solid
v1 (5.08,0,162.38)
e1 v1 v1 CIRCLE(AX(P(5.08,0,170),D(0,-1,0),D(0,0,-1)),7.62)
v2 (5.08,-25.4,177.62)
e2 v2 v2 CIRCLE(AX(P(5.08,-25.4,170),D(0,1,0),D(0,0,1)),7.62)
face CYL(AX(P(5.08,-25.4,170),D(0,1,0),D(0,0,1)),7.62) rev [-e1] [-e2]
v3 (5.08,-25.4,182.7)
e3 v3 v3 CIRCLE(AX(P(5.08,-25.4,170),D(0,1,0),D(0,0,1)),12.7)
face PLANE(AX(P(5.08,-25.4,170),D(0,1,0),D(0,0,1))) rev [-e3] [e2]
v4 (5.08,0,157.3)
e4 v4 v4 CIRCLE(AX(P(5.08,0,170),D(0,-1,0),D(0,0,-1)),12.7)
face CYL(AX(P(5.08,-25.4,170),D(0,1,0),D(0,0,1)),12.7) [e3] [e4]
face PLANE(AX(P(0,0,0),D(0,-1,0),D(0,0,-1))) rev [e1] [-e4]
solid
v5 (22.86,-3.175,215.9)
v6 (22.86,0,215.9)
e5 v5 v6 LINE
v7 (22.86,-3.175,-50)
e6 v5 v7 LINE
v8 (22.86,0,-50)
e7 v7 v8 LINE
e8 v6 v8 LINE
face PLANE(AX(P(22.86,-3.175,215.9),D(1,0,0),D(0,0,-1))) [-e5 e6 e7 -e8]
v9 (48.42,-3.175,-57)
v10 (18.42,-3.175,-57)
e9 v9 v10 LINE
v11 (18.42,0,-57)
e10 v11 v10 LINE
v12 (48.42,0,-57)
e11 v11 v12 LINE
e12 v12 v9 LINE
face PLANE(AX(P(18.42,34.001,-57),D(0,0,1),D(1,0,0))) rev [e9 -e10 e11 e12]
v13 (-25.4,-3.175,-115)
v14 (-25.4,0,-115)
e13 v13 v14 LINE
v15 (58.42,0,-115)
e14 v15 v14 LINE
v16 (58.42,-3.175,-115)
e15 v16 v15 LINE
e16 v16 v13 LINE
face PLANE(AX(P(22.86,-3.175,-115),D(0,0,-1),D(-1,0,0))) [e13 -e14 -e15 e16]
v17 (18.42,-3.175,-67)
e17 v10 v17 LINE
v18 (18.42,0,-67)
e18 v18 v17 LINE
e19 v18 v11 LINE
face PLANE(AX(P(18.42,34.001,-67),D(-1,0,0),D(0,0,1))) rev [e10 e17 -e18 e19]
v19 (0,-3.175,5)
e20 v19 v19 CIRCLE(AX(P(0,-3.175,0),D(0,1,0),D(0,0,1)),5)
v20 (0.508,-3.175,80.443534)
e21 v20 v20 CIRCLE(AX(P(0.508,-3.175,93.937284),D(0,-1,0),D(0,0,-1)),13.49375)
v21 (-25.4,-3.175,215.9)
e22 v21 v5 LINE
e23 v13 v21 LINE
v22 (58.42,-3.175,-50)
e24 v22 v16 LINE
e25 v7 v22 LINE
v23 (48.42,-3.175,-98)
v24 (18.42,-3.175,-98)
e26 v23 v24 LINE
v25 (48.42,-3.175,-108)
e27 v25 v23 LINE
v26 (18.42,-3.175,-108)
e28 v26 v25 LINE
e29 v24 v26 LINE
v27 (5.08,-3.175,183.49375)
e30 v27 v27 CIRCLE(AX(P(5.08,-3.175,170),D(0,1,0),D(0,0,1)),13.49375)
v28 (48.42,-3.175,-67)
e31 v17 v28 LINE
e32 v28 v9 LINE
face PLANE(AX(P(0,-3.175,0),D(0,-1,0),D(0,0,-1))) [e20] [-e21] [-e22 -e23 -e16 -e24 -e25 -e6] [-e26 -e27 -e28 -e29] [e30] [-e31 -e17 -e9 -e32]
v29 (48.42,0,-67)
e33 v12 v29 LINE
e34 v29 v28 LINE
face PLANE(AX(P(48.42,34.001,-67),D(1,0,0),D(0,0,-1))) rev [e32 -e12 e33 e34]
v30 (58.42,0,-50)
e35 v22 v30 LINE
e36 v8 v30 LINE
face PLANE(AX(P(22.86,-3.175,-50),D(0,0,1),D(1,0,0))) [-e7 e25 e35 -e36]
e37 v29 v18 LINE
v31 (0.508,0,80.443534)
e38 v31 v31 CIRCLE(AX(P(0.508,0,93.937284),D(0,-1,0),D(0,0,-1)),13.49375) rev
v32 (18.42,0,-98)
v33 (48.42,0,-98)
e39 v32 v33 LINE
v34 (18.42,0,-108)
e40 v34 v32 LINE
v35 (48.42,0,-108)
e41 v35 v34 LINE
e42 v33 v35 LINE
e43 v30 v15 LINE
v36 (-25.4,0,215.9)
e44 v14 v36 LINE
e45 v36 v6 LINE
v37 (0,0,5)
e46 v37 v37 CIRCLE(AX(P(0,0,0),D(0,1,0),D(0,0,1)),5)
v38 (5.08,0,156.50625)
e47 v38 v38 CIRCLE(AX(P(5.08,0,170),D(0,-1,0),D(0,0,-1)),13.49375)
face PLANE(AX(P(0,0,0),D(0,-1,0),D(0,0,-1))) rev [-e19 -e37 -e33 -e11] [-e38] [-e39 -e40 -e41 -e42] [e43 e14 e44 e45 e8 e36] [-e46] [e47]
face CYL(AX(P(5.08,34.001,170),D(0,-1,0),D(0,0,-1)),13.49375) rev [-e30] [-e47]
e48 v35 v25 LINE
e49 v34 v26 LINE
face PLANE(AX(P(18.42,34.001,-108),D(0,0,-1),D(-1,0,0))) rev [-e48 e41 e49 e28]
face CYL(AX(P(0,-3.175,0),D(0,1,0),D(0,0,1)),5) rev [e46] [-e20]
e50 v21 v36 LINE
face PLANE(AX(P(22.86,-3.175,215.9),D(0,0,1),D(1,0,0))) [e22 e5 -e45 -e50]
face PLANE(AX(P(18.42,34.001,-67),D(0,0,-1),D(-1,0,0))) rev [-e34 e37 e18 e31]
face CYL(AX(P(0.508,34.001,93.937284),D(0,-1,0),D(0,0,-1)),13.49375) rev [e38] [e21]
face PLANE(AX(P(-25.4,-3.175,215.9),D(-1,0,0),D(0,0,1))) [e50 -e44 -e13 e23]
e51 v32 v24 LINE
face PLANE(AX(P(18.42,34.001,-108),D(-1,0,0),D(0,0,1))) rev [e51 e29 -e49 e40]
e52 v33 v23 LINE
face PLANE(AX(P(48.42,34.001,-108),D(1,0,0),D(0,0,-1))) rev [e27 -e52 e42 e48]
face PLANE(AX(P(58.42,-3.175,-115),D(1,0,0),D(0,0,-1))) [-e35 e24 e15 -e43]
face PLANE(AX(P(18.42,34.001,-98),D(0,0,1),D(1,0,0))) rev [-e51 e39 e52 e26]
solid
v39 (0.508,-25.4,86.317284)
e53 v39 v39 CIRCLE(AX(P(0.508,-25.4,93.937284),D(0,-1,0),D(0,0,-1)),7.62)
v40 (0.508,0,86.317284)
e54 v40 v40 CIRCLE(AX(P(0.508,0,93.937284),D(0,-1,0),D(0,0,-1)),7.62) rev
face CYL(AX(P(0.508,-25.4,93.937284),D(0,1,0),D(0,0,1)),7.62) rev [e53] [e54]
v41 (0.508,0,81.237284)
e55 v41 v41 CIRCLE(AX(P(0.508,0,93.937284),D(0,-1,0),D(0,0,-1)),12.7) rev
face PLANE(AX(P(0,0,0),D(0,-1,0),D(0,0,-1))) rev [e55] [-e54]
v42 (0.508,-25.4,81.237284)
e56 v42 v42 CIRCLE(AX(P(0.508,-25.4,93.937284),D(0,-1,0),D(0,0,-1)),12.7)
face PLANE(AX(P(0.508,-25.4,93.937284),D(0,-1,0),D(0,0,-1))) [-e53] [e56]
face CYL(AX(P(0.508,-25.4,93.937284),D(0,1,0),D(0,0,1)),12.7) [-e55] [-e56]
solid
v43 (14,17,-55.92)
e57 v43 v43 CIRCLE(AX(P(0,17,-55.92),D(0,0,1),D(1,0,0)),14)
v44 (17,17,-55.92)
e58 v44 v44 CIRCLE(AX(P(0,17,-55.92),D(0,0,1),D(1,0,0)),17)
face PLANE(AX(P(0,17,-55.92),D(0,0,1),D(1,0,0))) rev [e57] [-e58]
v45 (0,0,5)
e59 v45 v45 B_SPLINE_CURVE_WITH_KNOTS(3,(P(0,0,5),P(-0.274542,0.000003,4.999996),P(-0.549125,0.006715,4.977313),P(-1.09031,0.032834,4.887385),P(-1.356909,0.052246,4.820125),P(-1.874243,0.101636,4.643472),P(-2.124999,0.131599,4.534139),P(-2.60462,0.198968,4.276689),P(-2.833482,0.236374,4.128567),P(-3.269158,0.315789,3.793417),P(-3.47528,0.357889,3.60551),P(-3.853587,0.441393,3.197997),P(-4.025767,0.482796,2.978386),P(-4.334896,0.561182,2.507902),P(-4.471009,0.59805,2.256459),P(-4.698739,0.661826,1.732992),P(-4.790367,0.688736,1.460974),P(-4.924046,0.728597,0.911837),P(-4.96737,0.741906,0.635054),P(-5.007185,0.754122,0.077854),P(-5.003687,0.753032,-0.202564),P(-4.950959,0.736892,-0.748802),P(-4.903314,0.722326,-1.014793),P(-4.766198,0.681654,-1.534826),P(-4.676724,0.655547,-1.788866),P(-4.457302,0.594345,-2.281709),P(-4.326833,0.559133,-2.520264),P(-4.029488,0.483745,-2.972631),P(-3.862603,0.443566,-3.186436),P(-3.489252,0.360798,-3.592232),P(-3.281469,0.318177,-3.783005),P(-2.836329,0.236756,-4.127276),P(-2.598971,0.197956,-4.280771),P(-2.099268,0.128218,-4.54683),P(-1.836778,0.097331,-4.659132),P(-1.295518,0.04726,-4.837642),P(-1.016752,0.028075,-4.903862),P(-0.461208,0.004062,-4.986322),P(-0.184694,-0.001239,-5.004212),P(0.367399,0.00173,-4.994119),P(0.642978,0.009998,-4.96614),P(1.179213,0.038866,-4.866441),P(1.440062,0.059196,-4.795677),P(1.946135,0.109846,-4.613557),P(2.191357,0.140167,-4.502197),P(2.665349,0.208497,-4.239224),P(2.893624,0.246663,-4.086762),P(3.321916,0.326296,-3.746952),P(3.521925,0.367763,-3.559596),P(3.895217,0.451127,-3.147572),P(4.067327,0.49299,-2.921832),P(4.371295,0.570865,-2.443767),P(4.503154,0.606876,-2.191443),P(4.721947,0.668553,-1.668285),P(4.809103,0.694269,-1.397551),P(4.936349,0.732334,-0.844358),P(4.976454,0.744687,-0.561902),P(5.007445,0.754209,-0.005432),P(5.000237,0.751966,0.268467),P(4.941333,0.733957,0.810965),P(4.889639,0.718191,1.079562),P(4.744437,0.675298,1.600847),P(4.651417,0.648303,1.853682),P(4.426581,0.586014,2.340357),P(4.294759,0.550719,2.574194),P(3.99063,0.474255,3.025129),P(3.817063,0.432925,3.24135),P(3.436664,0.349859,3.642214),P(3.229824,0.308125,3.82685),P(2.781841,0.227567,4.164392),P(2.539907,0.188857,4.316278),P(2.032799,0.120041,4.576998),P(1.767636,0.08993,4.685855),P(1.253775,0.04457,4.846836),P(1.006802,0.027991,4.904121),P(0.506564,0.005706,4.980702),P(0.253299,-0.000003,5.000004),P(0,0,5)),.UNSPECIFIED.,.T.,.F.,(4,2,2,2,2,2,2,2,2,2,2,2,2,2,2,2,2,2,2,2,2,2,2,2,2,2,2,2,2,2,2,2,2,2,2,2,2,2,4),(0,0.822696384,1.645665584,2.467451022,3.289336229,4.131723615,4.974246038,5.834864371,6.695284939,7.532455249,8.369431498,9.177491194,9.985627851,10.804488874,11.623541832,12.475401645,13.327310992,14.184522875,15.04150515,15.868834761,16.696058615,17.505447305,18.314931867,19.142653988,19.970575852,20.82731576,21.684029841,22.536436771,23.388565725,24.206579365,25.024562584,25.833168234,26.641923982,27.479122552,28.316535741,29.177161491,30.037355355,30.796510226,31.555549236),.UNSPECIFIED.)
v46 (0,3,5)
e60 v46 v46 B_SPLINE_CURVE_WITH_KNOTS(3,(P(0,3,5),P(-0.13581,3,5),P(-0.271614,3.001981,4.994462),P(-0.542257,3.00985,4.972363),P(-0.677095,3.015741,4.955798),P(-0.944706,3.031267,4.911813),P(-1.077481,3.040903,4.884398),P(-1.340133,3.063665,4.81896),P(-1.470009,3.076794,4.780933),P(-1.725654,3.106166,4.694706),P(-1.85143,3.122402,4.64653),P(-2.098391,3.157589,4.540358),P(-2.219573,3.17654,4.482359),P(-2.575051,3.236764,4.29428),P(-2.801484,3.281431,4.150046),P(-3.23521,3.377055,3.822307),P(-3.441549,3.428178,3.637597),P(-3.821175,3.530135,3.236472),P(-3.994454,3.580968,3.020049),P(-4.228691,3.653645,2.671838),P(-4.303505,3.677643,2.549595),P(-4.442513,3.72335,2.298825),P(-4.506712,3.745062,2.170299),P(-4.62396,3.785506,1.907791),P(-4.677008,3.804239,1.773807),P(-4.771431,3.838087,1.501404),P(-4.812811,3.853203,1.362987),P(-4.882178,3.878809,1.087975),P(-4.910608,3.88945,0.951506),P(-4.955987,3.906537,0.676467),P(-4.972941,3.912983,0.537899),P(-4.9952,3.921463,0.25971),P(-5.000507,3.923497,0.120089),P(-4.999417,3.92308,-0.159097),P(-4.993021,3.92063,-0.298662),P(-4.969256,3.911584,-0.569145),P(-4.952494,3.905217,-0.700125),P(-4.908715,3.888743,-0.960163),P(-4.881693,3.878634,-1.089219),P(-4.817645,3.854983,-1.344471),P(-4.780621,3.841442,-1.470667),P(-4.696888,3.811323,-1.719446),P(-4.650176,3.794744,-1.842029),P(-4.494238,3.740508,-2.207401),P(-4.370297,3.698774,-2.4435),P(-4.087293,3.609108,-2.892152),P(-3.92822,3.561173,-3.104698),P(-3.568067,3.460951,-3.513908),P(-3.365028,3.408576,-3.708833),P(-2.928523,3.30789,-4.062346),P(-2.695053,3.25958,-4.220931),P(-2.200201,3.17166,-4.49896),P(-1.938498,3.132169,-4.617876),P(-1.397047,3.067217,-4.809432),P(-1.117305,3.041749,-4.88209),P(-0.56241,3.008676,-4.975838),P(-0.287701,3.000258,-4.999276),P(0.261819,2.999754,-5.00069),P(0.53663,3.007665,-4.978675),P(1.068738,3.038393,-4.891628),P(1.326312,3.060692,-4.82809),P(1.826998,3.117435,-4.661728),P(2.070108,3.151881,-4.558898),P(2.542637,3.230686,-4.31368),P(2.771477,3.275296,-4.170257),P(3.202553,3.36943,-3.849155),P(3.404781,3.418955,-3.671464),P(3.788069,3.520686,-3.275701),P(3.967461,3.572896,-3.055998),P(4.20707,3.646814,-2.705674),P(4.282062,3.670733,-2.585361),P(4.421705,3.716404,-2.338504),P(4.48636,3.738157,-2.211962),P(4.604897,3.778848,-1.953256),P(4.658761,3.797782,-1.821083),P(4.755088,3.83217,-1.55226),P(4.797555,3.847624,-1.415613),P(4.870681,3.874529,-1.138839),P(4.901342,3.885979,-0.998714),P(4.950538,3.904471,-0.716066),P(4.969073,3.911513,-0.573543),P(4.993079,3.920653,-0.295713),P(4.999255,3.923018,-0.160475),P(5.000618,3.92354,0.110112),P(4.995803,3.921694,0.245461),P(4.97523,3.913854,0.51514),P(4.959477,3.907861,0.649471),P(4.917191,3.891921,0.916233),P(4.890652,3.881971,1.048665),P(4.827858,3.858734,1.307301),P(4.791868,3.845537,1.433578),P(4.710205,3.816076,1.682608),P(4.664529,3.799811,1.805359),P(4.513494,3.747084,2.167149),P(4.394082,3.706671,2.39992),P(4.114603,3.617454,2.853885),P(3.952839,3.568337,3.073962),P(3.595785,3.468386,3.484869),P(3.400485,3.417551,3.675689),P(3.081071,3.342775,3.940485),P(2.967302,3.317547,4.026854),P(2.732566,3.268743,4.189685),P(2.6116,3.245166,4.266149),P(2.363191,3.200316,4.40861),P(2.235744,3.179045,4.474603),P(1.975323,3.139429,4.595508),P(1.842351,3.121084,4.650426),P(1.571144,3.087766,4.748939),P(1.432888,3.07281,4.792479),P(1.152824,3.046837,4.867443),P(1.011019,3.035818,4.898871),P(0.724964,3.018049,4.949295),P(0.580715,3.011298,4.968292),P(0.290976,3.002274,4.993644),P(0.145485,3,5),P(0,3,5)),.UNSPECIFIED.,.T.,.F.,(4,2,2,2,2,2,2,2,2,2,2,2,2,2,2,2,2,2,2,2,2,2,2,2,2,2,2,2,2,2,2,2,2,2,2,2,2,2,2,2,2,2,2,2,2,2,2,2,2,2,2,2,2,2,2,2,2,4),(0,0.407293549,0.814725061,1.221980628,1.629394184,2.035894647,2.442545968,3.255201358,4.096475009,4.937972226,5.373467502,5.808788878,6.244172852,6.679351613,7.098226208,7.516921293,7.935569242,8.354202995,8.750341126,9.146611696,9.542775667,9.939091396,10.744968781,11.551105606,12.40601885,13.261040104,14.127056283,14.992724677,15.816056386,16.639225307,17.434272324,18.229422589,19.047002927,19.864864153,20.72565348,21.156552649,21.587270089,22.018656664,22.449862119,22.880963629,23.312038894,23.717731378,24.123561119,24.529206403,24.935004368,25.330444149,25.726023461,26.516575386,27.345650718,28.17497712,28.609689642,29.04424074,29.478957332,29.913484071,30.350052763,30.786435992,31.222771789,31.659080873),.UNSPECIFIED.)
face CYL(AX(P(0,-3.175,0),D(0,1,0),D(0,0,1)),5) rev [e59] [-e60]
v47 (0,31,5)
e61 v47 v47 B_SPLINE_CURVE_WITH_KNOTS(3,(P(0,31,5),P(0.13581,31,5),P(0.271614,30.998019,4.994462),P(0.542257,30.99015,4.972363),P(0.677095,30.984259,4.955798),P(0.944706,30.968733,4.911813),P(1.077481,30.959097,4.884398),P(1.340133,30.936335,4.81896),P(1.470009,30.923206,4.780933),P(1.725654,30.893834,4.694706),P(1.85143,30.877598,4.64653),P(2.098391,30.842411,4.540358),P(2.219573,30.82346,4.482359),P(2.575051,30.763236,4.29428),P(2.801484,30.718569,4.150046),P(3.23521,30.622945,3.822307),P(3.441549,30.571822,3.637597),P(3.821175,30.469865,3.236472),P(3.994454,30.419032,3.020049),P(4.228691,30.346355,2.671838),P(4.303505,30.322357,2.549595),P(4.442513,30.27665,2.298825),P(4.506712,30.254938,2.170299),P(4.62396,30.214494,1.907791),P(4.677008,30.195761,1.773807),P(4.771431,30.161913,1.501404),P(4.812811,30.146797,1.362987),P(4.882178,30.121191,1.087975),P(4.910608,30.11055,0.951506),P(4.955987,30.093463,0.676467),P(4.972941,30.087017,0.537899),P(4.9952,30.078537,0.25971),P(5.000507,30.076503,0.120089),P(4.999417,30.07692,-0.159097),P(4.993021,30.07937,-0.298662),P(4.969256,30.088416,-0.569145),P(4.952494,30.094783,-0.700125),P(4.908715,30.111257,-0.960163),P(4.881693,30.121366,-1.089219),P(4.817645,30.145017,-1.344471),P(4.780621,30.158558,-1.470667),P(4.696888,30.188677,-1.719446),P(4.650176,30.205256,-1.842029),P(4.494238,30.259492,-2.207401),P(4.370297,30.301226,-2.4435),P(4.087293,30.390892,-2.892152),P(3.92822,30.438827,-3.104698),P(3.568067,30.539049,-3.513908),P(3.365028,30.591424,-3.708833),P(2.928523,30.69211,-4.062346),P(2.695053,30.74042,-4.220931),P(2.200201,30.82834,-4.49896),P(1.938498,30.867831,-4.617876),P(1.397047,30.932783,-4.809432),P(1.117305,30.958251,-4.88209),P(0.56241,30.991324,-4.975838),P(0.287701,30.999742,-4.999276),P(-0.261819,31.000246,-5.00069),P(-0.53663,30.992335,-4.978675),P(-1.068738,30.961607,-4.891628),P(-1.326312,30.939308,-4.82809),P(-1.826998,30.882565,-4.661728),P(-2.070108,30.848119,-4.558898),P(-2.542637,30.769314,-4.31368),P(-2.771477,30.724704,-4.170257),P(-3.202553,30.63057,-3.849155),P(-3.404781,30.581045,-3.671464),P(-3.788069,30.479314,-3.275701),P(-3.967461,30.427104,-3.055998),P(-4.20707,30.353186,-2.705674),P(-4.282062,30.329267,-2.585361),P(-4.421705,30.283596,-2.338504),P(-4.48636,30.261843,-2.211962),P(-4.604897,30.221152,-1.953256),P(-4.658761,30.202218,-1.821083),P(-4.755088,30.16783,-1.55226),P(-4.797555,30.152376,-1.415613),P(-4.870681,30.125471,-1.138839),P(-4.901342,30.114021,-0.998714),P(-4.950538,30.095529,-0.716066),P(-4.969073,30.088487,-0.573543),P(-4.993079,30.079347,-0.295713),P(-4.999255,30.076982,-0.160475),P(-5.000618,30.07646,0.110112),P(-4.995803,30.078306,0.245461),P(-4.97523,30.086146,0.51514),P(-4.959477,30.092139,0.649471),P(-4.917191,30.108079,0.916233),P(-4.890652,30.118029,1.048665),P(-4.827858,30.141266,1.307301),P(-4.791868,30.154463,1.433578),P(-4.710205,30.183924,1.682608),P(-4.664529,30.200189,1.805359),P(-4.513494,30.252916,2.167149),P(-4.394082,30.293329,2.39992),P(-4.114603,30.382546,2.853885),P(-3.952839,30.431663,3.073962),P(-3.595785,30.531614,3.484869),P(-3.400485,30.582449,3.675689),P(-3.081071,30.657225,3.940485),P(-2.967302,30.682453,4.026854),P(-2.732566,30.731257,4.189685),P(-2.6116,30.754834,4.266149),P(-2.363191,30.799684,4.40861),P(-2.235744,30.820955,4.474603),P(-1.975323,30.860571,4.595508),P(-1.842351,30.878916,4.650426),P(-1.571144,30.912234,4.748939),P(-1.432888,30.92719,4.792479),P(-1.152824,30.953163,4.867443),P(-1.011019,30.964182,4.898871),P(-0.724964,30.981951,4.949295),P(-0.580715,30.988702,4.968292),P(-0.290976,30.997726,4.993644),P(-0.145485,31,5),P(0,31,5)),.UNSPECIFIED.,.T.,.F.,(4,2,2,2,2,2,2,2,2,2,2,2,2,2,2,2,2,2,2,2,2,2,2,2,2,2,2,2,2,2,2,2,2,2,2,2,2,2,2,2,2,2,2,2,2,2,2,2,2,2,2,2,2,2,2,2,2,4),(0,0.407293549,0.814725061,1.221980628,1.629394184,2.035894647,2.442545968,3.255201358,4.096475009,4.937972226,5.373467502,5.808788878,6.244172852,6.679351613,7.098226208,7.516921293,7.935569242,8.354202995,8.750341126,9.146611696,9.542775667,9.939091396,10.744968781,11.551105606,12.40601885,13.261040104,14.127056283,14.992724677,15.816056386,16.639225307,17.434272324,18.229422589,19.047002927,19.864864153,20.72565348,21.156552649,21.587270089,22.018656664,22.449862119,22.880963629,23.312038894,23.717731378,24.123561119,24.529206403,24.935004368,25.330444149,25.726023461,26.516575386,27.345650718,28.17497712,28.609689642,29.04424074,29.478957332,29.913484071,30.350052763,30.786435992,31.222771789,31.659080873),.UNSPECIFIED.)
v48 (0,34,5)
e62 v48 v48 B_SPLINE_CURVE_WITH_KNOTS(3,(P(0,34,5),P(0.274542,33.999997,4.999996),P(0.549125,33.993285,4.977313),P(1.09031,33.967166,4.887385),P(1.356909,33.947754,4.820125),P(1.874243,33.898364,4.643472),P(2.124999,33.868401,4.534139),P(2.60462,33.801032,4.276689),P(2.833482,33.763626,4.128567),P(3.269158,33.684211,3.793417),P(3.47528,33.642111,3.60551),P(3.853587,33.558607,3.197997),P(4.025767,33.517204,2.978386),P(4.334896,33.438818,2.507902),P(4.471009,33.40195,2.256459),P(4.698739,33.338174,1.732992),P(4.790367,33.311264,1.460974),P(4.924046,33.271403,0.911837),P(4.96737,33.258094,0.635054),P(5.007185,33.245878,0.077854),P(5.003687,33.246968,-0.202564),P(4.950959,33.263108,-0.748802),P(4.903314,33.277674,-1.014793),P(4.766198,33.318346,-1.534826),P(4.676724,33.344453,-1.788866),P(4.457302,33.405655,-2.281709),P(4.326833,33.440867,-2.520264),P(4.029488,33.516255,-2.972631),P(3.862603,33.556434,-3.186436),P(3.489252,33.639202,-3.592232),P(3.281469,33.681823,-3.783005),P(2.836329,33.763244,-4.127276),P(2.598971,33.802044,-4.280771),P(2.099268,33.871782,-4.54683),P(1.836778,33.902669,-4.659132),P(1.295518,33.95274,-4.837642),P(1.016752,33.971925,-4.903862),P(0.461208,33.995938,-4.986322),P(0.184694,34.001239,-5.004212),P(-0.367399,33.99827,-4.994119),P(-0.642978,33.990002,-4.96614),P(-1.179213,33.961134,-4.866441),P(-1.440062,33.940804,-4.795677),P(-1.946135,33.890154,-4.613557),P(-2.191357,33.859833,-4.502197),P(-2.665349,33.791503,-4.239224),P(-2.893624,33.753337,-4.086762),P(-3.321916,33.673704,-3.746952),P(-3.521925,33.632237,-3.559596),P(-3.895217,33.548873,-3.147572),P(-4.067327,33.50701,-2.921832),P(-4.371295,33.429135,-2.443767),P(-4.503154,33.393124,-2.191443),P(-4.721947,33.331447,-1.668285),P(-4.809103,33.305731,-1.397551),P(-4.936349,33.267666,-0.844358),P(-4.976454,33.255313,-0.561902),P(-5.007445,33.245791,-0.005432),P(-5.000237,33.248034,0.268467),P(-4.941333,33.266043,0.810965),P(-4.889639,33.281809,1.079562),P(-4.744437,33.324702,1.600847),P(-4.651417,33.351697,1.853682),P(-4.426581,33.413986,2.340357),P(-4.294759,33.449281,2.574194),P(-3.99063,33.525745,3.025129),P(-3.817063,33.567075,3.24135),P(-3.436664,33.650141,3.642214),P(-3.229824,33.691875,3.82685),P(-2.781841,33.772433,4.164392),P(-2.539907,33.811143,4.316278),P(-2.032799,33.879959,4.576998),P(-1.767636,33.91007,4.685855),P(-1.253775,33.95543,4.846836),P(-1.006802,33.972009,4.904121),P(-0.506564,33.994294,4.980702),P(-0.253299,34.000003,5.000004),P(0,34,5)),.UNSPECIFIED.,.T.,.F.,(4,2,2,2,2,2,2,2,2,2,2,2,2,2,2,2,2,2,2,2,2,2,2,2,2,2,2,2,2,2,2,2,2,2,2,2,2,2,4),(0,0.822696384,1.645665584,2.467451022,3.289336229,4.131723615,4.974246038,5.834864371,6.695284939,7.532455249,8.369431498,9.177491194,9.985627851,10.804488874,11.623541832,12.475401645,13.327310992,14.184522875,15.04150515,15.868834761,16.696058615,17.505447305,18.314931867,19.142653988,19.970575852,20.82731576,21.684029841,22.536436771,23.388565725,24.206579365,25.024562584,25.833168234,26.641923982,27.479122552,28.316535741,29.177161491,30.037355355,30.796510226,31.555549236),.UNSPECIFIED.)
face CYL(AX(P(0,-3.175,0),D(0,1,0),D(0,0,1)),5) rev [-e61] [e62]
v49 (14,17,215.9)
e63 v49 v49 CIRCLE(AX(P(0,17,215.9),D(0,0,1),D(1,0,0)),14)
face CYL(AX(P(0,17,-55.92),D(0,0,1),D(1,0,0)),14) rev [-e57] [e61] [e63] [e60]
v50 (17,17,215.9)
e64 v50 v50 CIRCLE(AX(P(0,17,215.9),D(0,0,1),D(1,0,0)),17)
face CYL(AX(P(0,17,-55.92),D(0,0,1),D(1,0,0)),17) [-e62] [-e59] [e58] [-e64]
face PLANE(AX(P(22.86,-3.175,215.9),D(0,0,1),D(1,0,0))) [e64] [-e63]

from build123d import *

# Parameters (mm, degrees)
SKETCH1_R                  = 5
BASE_FLANGE1_DEPTH         = 3.175
BOSS_EXTRUDE2_DEPTH        = 215.9
BOSS_EXTRUDE2_DEPTH_BACK   = 55.92
SKETCH7_R                  = 17
SKETCH7_R_2                = 14
CUT_EXTRUDE1_DEPTH         = 227.233742841
CUT_EXTRUDE1_DEPTH_BACK    = 227.233742841
SKETCH8_R                  = 5
SKETCH9_W                  = 30
SKETCH9_H                  = 10
CUT_EXTRUDE2_DEPTH         = 3.175
SKETCH6_R                  = 13.49375
CUT_EXTRUDE4_DEPTH         = 3.175
BOSS_EXTRUDE3_DEPTH        = 3.175
BOSS_EXTRUDE3_DEPTH_BACK   = 22.225
SKETCH6_5_R                = 12.7
SKETCH6_5_R_2              = 7.62
BOSS_EXTRUDE3_2_DEPTH      = 3.175
BOSS_EXTRUDE3_2_DEPTH_BACK = 22.225


# Sheet-metal steps are written as plain solids
with BuildPart() as part:
    # Sketch1 → Base-Flange1 (new body)
    with BuildSketch(Plane(origin=(0, 0, 0), x_dir=(1, 0, 0), z_dir=(0, 1, 0))):
        Polygon((22.86, -215.9), (-25.4, -215.9), (-25.4, 115), (22.86, 115), (58.42, 115), (58.42, 50), (22.86, 50), align=None)
        with Locations(Location((0, 0, 0), (0, 0, 270))):
            Circle(SKETCH1_R, mode=Mode.SUBTRACT)
    extrude(amount=-BASE_FLANGE1_DEPTH)

    # Sketch9 → Cut-Extrude2 (cut)
    with BuildSketch(Plane.XZ.offset(3.175)):
        with Locations((33.42, -103)):
            Rectangle(SKETCH9_W, SKETCH9_H)
        with Locations((33.42, -62)):
            Rectangle(SKETCH9_W, SKETCH9_H)
    extrude(amount=-CUT_EXTRUDE2_DEPTH, mode=Mode.SUBTRACT)

    # Sketch6 → Cut-Extrude4 (cut)
    with BuildSketch(Plane(origin=(0, -3.175, 0), x_dir=(1, 0, 0), z_dir=(0, 1, 0))):
        with Locations(Location((5.08, -170, 0), (0, 0, 90))):
            Circle(SKETCH6_R)
        with Locations(Location((0.508, -93.937283667, 0), (0, 0, 90))):
            Circle(SKETCH6_R)
    extrude(amount=CUT_EXTRUDE4_DEPTH, mode=Mode.SUBTRACT)


with BuildPart() as body_2:
    # Sketch7 → Boss-Extrude2 (new, two sides: drawn at the far end of the back side and taken through both)
    with BuildSketch(Plane.XY.offset(-BOSS_EXTRUDE2_DEPTH_BACK)):
        with Locations((0, 17)):
            Circle(SKETCH7_R)
        with Locations((0, 17)):
            Circle(SKETCH7_R_2, mode=Mode.SUBTRACT)
    extrude(amount=BOSS_EXTRUDE2_DEPTH + BOSS_EXTRUDE2_DEPTH_BACK)

    # Sketch8 → Cut-Extrude1 (cut, two sides: drawn at the far end of the back side and taken through both)
    with BuildSketch(Plane(origin=(0, 0, 0), x_dir=(1, 0, 0), z_dir=(0, 1, 0)).offset(-CUT_EXTRUDE1_DEPTH_BACK)):
        with Locations(Location((0, 0, 0), (0, 0, 270))):
            Circle(SKETCH8_R)
    extrude(amount=CUT_EXTRUDE1_DEPTH + CUT_EXTRUDE1_DEPTH_BACK, mode=Mode.SUBTRACT)


with BuildPart() as body_3:
    # Sketch6<5> → Boss-Extrude3 (new, two sides: drawn at the far end of the back side and taken through both)
    with BuildSketch(Plane(origin=(0, -3.175, 0), x_dir=(1, 0, 0), z_dir=(0, 1, 0)).offset(-BOSS_EXTRUDE3_DEPTH_BACK)):
        with Locations(Location((5.08, -170, 0), (0, 0, 270))):
            Circle(SKETCH6_5_R)
        with Locations(Location((5.08, -170, 0), (0, 0, 270))):
            Circle(SKETCH6_5_R_2, mode=Mode.SUBTRACT)
    extrude(amount=BOSS_EXTRUDE3_DEPTH + BOSS_EXTRUDE3_DEPTH_BACK)


with BuildPart() as body_4:
    # Sketch6<5> → Boss-Extrude3 2 (new, two sides: drawn at the far end of the back side and taken through both)
    with BuildSketch(Plane(origin=(0, -3.175, 0), x_dir=(1, 0, 0), z_dir=(0, 1, 0)).offset(-BOSS_EXTRUDE3_2_DEPTH_BACK)):
        with Locations(Location((0.508, -93.937283667, 0), (0, 0, 90))):
            Circle(SKETCH6_5_R)
        with Locations(Location((0.508, -93.937283667, 0), (0, 0, 90))):
            Circle(SKETCH6_5_R_2, mode=Mode.SUBTRACT)
    extrude(amount=BOSS_EXTRUDE3_2_DEPTH + BOSS_EXTRUDE3_2_DEPTH_BACK)


solid = Compound([part.part, body_2.part, body_3.part, body_4.part])
